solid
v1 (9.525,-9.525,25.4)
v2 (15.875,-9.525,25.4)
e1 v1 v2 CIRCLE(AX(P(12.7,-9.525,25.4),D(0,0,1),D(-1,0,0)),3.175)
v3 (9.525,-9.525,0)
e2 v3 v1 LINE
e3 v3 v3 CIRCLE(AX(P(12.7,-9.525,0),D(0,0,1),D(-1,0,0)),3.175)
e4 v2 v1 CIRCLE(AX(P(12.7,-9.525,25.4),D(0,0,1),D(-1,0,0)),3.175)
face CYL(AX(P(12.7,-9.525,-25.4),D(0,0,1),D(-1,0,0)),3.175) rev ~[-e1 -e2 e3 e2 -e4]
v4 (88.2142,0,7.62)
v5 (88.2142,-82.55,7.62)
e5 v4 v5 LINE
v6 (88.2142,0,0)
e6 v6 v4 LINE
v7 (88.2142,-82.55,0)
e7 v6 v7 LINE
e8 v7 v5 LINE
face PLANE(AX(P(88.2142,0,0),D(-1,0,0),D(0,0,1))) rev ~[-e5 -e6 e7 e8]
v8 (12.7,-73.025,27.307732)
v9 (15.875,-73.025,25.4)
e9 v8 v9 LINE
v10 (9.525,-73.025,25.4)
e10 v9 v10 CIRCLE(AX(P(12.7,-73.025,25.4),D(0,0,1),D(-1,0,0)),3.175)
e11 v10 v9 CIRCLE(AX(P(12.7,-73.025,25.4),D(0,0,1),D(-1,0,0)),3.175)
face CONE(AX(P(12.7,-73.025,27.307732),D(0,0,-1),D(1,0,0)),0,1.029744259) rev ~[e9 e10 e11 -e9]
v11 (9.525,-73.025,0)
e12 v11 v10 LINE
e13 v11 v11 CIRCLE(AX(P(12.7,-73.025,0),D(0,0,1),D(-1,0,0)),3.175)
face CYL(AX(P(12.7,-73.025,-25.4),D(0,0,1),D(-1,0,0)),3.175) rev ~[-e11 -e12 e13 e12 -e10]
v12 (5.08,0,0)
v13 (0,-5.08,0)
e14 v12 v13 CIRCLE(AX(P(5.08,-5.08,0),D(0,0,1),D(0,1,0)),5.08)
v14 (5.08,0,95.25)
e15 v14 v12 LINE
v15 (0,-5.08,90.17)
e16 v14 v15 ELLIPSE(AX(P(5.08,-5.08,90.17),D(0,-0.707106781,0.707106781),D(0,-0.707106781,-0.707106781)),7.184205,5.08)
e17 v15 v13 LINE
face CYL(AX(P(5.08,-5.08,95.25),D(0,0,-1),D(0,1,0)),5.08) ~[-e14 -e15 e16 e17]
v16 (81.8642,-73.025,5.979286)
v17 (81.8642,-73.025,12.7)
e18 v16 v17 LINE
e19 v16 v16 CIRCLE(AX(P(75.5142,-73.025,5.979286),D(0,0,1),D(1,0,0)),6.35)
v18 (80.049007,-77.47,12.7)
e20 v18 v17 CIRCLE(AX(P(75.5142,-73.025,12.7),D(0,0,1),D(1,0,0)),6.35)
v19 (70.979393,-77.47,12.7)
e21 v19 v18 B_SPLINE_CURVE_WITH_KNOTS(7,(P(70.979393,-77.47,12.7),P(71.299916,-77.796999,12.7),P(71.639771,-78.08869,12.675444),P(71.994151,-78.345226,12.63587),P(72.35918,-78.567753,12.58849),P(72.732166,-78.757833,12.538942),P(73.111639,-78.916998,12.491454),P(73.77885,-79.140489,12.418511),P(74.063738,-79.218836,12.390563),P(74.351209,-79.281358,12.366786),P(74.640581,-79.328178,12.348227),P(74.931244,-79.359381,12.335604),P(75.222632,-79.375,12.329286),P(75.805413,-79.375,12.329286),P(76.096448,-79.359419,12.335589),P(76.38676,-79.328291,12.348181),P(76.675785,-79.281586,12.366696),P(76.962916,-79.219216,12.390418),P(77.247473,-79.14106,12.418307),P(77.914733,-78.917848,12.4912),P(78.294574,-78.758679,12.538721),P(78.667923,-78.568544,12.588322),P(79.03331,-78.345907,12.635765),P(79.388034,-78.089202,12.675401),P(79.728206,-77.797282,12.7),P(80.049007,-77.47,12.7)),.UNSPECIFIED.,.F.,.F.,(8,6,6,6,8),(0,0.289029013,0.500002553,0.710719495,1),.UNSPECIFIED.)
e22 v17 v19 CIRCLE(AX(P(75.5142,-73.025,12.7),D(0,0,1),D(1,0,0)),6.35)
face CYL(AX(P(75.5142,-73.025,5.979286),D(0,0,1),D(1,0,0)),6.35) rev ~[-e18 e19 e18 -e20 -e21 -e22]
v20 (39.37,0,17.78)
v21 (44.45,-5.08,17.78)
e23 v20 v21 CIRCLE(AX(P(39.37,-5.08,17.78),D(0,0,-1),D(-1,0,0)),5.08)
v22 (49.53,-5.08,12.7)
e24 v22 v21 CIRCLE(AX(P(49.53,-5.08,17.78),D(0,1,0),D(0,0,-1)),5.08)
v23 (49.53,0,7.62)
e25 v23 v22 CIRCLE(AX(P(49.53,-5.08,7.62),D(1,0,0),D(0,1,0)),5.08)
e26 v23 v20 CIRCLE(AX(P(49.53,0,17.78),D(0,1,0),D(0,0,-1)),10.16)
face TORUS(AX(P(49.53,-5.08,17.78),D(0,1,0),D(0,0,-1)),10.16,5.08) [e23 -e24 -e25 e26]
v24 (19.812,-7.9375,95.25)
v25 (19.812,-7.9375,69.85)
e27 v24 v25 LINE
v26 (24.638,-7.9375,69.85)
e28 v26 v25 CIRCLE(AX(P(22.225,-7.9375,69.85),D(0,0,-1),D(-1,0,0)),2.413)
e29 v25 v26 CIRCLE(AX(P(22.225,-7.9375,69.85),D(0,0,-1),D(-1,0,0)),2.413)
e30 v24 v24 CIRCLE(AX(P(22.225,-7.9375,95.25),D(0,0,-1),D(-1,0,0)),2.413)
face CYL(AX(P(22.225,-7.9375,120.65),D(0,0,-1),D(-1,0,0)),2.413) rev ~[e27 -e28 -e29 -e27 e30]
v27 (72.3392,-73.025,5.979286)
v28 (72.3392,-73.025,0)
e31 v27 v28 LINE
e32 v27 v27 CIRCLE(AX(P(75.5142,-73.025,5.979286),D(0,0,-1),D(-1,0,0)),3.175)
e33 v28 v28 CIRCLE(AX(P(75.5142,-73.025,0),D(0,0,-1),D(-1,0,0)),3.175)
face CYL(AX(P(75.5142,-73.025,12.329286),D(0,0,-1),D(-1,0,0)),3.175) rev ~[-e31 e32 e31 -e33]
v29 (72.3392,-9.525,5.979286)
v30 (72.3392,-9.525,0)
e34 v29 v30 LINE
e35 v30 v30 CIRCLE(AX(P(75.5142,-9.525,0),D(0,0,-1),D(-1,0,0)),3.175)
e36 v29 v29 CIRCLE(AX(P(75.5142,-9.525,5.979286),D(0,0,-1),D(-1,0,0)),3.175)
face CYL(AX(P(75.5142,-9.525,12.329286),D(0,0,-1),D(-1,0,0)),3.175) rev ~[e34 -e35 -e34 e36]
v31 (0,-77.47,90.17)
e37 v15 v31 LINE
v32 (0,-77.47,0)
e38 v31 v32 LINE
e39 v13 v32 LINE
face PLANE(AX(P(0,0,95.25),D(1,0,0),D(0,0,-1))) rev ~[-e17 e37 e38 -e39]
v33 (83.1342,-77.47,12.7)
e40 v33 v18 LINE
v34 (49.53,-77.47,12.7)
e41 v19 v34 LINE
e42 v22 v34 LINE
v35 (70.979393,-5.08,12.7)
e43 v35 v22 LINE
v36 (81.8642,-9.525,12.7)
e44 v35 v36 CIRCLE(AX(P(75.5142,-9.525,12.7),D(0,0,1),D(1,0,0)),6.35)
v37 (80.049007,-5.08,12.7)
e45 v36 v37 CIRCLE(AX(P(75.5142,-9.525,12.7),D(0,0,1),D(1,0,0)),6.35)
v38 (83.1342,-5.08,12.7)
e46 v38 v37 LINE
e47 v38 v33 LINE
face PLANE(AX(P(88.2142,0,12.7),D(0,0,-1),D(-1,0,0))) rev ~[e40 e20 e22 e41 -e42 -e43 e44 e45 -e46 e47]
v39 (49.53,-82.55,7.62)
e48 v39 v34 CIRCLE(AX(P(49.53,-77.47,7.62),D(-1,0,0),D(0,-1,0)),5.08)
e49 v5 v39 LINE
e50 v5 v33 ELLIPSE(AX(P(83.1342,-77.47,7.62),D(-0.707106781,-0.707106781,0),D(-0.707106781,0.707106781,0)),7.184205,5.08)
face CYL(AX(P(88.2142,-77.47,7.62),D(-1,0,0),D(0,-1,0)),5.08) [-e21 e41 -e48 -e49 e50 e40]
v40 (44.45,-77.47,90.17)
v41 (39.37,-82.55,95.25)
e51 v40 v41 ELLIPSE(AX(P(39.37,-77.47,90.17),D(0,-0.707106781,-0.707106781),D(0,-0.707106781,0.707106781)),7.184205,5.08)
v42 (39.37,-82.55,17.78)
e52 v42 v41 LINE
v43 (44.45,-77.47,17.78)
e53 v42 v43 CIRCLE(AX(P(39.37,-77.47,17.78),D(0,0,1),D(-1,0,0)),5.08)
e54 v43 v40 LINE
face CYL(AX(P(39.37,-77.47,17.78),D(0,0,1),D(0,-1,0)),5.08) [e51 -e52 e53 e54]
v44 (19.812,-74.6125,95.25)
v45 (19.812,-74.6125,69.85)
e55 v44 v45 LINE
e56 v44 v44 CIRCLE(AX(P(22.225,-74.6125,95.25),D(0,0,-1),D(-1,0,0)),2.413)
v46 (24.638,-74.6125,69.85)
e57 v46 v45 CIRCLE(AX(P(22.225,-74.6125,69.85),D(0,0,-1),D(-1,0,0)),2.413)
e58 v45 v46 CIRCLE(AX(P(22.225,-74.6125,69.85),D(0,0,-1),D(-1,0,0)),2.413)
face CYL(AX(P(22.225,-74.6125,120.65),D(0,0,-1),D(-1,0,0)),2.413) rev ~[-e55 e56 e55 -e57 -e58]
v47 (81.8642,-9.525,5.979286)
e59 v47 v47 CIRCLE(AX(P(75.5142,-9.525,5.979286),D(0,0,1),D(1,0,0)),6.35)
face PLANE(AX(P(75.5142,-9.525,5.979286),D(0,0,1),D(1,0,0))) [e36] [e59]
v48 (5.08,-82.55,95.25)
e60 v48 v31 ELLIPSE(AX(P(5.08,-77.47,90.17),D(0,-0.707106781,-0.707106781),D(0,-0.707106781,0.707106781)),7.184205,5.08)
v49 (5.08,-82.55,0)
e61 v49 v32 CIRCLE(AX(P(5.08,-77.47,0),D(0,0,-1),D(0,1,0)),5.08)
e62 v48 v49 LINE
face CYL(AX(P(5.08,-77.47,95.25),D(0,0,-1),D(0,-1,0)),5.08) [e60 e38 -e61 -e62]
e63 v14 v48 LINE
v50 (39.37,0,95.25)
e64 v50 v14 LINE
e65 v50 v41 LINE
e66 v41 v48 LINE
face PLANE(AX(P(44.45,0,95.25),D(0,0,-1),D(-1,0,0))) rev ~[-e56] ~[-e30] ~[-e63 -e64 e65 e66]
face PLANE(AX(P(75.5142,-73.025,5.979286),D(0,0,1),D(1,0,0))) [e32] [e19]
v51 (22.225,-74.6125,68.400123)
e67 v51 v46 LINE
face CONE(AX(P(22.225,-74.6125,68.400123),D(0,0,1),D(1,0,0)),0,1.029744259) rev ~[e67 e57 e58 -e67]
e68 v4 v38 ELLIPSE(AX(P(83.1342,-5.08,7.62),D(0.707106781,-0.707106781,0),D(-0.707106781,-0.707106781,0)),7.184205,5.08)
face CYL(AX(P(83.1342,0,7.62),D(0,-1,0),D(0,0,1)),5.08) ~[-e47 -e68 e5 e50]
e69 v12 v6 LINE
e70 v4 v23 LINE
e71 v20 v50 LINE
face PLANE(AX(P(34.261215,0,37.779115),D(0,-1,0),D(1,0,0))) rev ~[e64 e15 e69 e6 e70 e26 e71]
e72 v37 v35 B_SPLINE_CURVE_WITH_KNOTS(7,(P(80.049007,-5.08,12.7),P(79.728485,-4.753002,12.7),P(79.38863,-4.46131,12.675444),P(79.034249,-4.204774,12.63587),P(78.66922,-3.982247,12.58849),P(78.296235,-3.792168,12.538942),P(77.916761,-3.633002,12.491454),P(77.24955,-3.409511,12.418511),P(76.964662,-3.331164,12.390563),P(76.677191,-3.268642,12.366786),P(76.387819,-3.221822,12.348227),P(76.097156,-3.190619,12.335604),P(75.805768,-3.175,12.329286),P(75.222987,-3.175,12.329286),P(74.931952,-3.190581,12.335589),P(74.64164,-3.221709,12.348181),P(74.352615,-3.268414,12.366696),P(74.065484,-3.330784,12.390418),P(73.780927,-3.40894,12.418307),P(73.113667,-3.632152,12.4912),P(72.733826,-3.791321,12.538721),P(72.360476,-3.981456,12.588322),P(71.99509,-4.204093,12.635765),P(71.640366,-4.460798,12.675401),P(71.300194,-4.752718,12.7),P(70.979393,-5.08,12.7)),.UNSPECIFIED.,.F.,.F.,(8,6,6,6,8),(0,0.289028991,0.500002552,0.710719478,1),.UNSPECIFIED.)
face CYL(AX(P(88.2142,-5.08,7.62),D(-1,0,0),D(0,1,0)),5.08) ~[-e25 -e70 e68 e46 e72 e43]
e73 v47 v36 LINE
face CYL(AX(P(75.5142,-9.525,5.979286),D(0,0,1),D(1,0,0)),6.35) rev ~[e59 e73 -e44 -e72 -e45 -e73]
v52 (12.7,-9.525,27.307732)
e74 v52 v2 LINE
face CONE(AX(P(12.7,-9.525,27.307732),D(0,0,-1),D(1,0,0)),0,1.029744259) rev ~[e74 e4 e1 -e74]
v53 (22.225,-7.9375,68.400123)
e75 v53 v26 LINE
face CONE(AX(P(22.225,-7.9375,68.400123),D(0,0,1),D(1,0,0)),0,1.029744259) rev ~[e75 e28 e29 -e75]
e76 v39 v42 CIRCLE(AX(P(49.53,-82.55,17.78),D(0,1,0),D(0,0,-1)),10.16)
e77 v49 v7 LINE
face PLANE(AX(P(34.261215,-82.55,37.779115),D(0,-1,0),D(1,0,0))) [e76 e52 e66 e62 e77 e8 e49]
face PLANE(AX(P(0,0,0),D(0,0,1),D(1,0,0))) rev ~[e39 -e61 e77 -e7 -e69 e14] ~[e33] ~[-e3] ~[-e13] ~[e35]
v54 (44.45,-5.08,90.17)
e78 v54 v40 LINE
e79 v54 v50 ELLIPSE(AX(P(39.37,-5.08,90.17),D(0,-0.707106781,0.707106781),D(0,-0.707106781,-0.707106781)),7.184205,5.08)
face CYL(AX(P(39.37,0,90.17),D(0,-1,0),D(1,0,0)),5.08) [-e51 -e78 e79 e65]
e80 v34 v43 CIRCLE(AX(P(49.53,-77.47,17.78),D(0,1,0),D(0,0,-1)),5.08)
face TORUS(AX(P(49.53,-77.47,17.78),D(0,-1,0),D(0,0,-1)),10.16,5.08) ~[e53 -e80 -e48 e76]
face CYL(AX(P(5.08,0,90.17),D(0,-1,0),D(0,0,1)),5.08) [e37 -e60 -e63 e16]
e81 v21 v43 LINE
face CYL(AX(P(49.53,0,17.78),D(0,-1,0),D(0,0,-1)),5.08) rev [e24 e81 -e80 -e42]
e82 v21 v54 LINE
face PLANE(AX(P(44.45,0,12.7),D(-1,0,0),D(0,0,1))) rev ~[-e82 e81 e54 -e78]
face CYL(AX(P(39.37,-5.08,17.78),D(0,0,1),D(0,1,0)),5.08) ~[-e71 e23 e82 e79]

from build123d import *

# Parameters (mm, degrees)
F1_DEPTH       = 82.55
F2_F1_R        = 5.08
F2_F2_R        = 5.08
F4_D           = 4.826
F4_DEPTH       = 25.4
F4_TIP         = 1.4498766737
F6_D           = 6.35
F6_DEPTH       = 25.4
F6_TIP         = 1.9077324654
F8_D           = 6.35
F8_DEPTH       = 25.4
F8_START       = 0.3707141
F8_CBORE_D     = 12.7
F8_CBORE_DEPTH = 6.35
F8_TIP         = 1.9077324654


with BuildPart() as f1:
    # F0 (on Front) → F1 (new body)
    with BuildSketch(Plane.XZ):
        Polygon((0, 95.25), (0, 0), (88.2142, 0), (88.2142, 12.7), (44.45, 12.7), (44.45, 95.25), align=None)
    extrude(amount=F1_DEPTH)

    # F2: fillet of radius 5.08 on 8 edges, made by hand

    # F2_f1
    f2_f1_edges = [f1.edges().sort_by_distance(p)[0] for p in [
        (44.45, -41.275, 12.7),
    ]]
    fillet(f2_f1_edges, radius=F2_F1_R)

    # F2_f2
    f2_f2_edges = [f1.edges().sort_by_distance(p)[0] for p in [
        (44.45, -41.275, 95.25),
        (0, -41.275, 95.25),
        (44.45, -82.55, 56.515),
        (44.45, 0, 56.515),
        (0, -82.55, 47.625),
        (0, 0, 47.625),
        (88.2142, -41.275, 12.7),
        (45.9378975516, 0, 14.1878975516),
        (45.9378975516, -82.55, 14.1878975516),
    ]]
    fillet(f2_f2_edges, radius=F2_F2_R)

    # F4
    with Locations(Plane.XY.offset(95.25)):
        with Locations((22.225, -7.9375), (22.225, -74.6125)):
            Hole(F4_D / 2, depth=F4_DEPTH)
            with Locations((0, 0, -(F4_DEPTH + F4_TIP / 2))):  # 118° drill point
                Cone(0, F4_D / 2, F4_TIP, mode=Mode.SUBTRACT)

    # F6
    with Locations(Plane(origin=(0, 0, 0), x_dir=(1, 0, 0), z_dir=(0, 0, -1))):
        with Locations((12.7, 73.025), (12.7, 9.525)):
            Hole(F6_D / 2, depth=F6_DEPTH)
            with Locations((0, 0, -(F6_DEPTH + F6_TIP / 2))):  # 118° drill point
                Cone(0, F6_D / 2, F6_TIP, mode=Mode.SUBTRACT)

    # F8
    # its depths count from where the whole tool has entered the part; down to there all is cleared
    with Locations(Plane.XY.offset(12.7).offset(-F8_START)):
        with Locations((75.5142, -9.525), (75.5142, -73.025)):
            CounterBoreHole(F8_D / 2, F8_CBORE_D / 2, F8_CBORE_DEPTH, depth=F8_DEPTH)
            with Locations((0, 0, -(F8_DEPTH + F8_TIP / 2))):  # 118° drill point
                Cone(0, F8_D / 2, F8_TIP, mode=Mode.SUBTRACT)


solid = f1.part
